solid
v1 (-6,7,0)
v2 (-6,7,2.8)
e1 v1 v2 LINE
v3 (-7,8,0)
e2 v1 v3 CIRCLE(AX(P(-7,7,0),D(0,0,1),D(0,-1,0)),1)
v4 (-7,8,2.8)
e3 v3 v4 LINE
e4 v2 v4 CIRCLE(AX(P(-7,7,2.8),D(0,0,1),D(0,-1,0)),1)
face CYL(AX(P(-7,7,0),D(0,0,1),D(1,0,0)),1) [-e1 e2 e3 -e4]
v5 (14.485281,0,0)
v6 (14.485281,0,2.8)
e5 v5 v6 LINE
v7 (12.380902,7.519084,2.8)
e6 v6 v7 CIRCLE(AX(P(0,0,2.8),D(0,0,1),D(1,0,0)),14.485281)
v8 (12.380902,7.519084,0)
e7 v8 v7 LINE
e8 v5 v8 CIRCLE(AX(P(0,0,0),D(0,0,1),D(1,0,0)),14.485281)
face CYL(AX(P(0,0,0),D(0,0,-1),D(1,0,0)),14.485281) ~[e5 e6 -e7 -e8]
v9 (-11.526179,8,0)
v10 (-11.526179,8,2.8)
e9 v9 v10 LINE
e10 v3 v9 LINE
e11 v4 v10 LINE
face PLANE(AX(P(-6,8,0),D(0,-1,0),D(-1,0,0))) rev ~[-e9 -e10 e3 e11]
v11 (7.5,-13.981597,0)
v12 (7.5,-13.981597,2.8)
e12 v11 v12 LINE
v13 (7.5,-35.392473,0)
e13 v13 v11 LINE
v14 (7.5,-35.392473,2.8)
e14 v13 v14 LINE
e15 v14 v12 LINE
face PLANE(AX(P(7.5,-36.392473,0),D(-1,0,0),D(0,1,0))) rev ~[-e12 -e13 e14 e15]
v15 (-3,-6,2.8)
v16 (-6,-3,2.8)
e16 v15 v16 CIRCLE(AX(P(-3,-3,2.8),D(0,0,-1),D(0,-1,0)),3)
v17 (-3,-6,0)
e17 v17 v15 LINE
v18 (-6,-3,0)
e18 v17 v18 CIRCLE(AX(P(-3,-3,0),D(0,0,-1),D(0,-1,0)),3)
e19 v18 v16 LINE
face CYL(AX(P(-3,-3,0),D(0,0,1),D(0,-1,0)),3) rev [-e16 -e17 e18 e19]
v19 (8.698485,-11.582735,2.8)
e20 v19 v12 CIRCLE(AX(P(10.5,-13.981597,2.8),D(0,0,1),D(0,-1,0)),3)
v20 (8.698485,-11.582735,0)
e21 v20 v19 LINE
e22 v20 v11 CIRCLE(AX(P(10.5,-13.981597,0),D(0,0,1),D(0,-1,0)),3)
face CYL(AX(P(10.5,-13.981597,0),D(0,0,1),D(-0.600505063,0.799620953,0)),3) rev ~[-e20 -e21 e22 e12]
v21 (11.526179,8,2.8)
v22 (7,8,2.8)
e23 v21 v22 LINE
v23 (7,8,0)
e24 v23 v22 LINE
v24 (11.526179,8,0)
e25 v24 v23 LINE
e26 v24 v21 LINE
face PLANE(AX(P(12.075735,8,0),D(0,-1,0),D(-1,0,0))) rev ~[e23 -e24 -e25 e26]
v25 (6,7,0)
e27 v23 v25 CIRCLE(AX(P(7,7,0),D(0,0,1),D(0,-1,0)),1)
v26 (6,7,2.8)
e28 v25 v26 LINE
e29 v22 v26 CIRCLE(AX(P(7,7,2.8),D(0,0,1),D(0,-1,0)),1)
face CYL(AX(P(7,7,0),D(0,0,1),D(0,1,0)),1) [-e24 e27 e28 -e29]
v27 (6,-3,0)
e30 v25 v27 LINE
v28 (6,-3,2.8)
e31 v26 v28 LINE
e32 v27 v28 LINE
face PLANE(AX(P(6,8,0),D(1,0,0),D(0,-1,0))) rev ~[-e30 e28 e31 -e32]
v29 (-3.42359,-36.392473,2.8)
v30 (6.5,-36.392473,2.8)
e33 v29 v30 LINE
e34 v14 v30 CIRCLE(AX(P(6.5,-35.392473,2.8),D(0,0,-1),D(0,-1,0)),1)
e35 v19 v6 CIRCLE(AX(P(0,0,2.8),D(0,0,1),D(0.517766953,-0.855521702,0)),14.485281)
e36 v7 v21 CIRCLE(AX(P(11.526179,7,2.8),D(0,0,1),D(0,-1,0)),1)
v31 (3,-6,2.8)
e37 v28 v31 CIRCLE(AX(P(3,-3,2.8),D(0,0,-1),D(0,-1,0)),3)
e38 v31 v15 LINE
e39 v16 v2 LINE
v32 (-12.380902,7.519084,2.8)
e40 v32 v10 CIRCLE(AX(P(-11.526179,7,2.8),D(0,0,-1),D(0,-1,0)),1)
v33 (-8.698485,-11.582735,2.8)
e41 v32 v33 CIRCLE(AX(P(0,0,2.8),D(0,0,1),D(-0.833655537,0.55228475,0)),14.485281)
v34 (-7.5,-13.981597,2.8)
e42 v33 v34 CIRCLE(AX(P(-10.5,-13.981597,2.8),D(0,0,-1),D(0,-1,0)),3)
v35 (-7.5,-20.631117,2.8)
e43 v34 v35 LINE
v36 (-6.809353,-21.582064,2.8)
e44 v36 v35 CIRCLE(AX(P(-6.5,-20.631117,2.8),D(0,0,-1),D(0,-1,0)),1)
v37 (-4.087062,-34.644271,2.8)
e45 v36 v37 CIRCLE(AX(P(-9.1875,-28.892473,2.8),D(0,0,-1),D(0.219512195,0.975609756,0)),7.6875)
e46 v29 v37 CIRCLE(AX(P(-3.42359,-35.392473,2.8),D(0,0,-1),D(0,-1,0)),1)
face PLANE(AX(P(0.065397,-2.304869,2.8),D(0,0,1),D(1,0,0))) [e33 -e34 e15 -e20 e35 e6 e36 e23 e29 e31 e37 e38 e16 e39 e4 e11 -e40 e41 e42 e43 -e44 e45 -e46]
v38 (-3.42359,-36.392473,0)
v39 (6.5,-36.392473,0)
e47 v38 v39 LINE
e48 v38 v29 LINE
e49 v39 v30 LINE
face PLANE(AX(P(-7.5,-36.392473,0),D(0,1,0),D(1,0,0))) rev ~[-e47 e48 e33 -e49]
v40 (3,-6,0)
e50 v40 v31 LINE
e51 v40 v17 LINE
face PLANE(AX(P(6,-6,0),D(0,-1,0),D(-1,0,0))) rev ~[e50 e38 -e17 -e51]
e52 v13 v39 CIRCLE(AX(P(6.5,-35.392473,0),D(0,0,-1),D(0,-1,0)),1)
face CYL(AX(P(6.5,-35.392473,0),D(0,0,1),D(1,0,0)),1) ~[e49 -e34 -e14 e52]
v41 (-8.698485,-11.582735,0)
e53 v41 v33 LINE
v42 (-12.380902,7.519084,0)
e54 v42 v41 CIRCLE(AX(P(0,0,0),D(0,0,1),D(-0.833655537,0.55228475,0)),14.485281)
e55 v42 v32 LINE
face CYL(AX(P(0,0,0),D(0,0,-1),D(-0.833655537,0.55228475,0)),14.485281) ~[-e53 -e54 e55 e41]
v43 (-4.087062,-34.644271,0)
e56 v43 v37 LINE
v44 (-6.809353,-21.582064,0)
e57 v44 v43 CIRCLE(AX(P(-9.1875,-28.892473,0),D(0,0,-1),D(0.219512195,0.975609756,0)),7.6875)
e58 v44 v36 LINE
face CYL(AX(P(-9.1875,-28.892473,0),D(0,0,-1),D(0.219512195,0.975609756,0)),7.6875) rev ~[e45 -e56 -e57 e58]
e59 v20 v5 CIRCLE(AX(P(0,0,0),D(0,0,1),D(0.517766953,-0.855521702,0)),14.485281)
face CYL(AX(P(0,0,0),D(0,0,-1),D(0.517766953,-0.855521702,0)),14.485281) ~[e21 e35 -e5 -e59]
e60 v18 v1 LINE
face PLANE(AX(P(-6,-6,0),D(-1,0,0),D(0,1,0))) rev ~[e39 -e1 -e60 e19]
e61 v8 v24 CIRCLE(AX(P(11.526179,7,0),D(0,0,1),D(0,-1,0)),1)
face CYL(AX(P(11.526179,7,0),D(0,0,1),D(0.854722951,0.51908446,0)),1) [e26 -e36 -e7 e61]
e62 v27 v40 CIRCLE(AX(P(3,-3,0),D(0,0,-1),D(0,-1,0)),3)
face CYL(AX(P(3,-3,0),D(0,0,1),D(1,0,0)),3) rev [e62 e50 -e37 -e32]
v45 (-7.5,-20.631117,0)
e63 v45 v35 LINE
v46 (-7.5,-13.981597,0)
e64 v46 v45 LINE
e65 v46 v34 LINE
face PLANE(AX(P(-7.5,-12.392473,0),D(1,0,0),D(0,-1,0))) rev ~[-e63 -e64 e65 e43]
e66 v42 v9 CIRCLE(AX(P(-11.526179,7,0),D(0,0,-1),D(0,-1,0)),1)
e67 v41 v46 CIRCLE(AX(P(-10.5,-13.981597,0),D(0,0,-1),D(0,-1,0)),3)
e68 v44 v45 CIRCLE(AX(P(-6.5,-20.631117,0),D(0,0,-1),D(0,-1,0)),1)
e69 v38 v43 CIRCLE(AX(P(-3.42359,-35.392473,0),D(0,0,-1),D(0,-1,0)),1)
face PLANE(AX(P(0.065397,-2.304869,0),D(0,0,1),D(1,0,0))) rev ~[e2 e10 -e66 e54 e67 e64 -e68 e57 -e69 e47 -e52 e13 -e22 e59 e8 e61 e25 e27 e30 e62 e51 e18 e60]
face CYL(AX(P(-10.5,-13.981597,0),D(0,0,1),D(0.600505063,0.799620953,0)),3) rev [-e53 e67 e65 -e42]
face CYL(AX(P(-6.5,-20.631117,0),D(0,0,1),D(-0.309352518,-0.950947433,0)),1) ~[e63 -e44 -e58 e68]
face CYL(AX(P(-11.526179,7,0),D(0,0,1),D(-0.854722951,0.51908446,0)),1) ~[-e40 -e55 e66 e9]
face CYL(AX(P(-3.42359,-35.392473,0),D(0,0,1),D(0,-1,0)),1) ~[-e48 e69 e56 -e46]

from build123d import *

# Parameters (mm, degrees)
F1_DEPTH = 2.8
F2_R     = 3
F3_R     = 1


with BuildPart() as f1:
    # F0 (on Top) → F1 (new body)
    with BuildSketch(Plane.XY):
        with BuildLine():
            ThreePointArc((7.5, -12.3924725737), (12.6186961846, -7.1127971356), (14.4852813742, 0))
            ThreePointArc((14.4852813742, 0), (13.869819685, 4.1774966664), (12.075735029, 8))
            Line((12.075735029, 8), (6, 8))
            Line((6, 8), (6, 6))
            Line((6, 6), (6, -6))
            Line((6, -6), (-6, -6))
            Line((-6, -6), (-6, 6))
            Line((-6, 6), (-6, 8))
            Line((-6, 8), (-12.075735029, 8))
            ThreePointArc((-12.075735029, 8), (-14.1338453684, -3.1714021492), (-7.5, -12.3924725737))
            Line((-7.5, -12.3924725737), (7.5, -12.3924725737))
        make_face()
        with BuildLine():
            Line((7.5, -36.3924725737), (7.5, -12.3924725737))
            ThreePointArc((7.5, -12.3924725737), (0, -14.4852813742), (-7.5, -12.3924725737))
            Line((-7.5, -12.3924725737), (-7.5, -21.3924725737))
            ThreePointArc((-7.5, -21.3924725737), (-1.5, -28.8924725737), (-7.5, -36.3924725737))
            Line((-7.5, -36.3924725737), (7.5, -36.3924725737))
        make_face()
        with BuildLine():
            ThreePointArc((-7.5, -12.3924725737), (0, -14.4852813742), (7.5, -12.3924725737))
            Line((7.5, -12.3924725737), (-7.5, -12.3924725737))
        make_face()
    extrude(amount=F1_DEPTH)

    # F2
    f2_edges = [f1.edges().sort_by_distance(p)[0] for p in [
        (-7.5, -12.392473, 1.4),
        (7.5, -12.392473, 1.4),
        (6, -6, 1.4),
        (-6, -6, 1.4),
    ]]
    fillet(f2_edges, radius=F2_R)

    # F3
    f3_edges = [f1.edges().sort_by_distance(p)[0] for p in [
        (-7.5, -36.392473, 1.4),
        (7.5, -36.392473, 1.4),
        (6, 8, 1.4),
        (-6, 8, 1.4),
        (-12.075735, 8, 1.4),
        (12.075735, 8, 1.4),
        (-7.5, -21.392473, 1.4),
    ]]
    fillet(f3_edges, radius=F3_R)


solid = f1.part
